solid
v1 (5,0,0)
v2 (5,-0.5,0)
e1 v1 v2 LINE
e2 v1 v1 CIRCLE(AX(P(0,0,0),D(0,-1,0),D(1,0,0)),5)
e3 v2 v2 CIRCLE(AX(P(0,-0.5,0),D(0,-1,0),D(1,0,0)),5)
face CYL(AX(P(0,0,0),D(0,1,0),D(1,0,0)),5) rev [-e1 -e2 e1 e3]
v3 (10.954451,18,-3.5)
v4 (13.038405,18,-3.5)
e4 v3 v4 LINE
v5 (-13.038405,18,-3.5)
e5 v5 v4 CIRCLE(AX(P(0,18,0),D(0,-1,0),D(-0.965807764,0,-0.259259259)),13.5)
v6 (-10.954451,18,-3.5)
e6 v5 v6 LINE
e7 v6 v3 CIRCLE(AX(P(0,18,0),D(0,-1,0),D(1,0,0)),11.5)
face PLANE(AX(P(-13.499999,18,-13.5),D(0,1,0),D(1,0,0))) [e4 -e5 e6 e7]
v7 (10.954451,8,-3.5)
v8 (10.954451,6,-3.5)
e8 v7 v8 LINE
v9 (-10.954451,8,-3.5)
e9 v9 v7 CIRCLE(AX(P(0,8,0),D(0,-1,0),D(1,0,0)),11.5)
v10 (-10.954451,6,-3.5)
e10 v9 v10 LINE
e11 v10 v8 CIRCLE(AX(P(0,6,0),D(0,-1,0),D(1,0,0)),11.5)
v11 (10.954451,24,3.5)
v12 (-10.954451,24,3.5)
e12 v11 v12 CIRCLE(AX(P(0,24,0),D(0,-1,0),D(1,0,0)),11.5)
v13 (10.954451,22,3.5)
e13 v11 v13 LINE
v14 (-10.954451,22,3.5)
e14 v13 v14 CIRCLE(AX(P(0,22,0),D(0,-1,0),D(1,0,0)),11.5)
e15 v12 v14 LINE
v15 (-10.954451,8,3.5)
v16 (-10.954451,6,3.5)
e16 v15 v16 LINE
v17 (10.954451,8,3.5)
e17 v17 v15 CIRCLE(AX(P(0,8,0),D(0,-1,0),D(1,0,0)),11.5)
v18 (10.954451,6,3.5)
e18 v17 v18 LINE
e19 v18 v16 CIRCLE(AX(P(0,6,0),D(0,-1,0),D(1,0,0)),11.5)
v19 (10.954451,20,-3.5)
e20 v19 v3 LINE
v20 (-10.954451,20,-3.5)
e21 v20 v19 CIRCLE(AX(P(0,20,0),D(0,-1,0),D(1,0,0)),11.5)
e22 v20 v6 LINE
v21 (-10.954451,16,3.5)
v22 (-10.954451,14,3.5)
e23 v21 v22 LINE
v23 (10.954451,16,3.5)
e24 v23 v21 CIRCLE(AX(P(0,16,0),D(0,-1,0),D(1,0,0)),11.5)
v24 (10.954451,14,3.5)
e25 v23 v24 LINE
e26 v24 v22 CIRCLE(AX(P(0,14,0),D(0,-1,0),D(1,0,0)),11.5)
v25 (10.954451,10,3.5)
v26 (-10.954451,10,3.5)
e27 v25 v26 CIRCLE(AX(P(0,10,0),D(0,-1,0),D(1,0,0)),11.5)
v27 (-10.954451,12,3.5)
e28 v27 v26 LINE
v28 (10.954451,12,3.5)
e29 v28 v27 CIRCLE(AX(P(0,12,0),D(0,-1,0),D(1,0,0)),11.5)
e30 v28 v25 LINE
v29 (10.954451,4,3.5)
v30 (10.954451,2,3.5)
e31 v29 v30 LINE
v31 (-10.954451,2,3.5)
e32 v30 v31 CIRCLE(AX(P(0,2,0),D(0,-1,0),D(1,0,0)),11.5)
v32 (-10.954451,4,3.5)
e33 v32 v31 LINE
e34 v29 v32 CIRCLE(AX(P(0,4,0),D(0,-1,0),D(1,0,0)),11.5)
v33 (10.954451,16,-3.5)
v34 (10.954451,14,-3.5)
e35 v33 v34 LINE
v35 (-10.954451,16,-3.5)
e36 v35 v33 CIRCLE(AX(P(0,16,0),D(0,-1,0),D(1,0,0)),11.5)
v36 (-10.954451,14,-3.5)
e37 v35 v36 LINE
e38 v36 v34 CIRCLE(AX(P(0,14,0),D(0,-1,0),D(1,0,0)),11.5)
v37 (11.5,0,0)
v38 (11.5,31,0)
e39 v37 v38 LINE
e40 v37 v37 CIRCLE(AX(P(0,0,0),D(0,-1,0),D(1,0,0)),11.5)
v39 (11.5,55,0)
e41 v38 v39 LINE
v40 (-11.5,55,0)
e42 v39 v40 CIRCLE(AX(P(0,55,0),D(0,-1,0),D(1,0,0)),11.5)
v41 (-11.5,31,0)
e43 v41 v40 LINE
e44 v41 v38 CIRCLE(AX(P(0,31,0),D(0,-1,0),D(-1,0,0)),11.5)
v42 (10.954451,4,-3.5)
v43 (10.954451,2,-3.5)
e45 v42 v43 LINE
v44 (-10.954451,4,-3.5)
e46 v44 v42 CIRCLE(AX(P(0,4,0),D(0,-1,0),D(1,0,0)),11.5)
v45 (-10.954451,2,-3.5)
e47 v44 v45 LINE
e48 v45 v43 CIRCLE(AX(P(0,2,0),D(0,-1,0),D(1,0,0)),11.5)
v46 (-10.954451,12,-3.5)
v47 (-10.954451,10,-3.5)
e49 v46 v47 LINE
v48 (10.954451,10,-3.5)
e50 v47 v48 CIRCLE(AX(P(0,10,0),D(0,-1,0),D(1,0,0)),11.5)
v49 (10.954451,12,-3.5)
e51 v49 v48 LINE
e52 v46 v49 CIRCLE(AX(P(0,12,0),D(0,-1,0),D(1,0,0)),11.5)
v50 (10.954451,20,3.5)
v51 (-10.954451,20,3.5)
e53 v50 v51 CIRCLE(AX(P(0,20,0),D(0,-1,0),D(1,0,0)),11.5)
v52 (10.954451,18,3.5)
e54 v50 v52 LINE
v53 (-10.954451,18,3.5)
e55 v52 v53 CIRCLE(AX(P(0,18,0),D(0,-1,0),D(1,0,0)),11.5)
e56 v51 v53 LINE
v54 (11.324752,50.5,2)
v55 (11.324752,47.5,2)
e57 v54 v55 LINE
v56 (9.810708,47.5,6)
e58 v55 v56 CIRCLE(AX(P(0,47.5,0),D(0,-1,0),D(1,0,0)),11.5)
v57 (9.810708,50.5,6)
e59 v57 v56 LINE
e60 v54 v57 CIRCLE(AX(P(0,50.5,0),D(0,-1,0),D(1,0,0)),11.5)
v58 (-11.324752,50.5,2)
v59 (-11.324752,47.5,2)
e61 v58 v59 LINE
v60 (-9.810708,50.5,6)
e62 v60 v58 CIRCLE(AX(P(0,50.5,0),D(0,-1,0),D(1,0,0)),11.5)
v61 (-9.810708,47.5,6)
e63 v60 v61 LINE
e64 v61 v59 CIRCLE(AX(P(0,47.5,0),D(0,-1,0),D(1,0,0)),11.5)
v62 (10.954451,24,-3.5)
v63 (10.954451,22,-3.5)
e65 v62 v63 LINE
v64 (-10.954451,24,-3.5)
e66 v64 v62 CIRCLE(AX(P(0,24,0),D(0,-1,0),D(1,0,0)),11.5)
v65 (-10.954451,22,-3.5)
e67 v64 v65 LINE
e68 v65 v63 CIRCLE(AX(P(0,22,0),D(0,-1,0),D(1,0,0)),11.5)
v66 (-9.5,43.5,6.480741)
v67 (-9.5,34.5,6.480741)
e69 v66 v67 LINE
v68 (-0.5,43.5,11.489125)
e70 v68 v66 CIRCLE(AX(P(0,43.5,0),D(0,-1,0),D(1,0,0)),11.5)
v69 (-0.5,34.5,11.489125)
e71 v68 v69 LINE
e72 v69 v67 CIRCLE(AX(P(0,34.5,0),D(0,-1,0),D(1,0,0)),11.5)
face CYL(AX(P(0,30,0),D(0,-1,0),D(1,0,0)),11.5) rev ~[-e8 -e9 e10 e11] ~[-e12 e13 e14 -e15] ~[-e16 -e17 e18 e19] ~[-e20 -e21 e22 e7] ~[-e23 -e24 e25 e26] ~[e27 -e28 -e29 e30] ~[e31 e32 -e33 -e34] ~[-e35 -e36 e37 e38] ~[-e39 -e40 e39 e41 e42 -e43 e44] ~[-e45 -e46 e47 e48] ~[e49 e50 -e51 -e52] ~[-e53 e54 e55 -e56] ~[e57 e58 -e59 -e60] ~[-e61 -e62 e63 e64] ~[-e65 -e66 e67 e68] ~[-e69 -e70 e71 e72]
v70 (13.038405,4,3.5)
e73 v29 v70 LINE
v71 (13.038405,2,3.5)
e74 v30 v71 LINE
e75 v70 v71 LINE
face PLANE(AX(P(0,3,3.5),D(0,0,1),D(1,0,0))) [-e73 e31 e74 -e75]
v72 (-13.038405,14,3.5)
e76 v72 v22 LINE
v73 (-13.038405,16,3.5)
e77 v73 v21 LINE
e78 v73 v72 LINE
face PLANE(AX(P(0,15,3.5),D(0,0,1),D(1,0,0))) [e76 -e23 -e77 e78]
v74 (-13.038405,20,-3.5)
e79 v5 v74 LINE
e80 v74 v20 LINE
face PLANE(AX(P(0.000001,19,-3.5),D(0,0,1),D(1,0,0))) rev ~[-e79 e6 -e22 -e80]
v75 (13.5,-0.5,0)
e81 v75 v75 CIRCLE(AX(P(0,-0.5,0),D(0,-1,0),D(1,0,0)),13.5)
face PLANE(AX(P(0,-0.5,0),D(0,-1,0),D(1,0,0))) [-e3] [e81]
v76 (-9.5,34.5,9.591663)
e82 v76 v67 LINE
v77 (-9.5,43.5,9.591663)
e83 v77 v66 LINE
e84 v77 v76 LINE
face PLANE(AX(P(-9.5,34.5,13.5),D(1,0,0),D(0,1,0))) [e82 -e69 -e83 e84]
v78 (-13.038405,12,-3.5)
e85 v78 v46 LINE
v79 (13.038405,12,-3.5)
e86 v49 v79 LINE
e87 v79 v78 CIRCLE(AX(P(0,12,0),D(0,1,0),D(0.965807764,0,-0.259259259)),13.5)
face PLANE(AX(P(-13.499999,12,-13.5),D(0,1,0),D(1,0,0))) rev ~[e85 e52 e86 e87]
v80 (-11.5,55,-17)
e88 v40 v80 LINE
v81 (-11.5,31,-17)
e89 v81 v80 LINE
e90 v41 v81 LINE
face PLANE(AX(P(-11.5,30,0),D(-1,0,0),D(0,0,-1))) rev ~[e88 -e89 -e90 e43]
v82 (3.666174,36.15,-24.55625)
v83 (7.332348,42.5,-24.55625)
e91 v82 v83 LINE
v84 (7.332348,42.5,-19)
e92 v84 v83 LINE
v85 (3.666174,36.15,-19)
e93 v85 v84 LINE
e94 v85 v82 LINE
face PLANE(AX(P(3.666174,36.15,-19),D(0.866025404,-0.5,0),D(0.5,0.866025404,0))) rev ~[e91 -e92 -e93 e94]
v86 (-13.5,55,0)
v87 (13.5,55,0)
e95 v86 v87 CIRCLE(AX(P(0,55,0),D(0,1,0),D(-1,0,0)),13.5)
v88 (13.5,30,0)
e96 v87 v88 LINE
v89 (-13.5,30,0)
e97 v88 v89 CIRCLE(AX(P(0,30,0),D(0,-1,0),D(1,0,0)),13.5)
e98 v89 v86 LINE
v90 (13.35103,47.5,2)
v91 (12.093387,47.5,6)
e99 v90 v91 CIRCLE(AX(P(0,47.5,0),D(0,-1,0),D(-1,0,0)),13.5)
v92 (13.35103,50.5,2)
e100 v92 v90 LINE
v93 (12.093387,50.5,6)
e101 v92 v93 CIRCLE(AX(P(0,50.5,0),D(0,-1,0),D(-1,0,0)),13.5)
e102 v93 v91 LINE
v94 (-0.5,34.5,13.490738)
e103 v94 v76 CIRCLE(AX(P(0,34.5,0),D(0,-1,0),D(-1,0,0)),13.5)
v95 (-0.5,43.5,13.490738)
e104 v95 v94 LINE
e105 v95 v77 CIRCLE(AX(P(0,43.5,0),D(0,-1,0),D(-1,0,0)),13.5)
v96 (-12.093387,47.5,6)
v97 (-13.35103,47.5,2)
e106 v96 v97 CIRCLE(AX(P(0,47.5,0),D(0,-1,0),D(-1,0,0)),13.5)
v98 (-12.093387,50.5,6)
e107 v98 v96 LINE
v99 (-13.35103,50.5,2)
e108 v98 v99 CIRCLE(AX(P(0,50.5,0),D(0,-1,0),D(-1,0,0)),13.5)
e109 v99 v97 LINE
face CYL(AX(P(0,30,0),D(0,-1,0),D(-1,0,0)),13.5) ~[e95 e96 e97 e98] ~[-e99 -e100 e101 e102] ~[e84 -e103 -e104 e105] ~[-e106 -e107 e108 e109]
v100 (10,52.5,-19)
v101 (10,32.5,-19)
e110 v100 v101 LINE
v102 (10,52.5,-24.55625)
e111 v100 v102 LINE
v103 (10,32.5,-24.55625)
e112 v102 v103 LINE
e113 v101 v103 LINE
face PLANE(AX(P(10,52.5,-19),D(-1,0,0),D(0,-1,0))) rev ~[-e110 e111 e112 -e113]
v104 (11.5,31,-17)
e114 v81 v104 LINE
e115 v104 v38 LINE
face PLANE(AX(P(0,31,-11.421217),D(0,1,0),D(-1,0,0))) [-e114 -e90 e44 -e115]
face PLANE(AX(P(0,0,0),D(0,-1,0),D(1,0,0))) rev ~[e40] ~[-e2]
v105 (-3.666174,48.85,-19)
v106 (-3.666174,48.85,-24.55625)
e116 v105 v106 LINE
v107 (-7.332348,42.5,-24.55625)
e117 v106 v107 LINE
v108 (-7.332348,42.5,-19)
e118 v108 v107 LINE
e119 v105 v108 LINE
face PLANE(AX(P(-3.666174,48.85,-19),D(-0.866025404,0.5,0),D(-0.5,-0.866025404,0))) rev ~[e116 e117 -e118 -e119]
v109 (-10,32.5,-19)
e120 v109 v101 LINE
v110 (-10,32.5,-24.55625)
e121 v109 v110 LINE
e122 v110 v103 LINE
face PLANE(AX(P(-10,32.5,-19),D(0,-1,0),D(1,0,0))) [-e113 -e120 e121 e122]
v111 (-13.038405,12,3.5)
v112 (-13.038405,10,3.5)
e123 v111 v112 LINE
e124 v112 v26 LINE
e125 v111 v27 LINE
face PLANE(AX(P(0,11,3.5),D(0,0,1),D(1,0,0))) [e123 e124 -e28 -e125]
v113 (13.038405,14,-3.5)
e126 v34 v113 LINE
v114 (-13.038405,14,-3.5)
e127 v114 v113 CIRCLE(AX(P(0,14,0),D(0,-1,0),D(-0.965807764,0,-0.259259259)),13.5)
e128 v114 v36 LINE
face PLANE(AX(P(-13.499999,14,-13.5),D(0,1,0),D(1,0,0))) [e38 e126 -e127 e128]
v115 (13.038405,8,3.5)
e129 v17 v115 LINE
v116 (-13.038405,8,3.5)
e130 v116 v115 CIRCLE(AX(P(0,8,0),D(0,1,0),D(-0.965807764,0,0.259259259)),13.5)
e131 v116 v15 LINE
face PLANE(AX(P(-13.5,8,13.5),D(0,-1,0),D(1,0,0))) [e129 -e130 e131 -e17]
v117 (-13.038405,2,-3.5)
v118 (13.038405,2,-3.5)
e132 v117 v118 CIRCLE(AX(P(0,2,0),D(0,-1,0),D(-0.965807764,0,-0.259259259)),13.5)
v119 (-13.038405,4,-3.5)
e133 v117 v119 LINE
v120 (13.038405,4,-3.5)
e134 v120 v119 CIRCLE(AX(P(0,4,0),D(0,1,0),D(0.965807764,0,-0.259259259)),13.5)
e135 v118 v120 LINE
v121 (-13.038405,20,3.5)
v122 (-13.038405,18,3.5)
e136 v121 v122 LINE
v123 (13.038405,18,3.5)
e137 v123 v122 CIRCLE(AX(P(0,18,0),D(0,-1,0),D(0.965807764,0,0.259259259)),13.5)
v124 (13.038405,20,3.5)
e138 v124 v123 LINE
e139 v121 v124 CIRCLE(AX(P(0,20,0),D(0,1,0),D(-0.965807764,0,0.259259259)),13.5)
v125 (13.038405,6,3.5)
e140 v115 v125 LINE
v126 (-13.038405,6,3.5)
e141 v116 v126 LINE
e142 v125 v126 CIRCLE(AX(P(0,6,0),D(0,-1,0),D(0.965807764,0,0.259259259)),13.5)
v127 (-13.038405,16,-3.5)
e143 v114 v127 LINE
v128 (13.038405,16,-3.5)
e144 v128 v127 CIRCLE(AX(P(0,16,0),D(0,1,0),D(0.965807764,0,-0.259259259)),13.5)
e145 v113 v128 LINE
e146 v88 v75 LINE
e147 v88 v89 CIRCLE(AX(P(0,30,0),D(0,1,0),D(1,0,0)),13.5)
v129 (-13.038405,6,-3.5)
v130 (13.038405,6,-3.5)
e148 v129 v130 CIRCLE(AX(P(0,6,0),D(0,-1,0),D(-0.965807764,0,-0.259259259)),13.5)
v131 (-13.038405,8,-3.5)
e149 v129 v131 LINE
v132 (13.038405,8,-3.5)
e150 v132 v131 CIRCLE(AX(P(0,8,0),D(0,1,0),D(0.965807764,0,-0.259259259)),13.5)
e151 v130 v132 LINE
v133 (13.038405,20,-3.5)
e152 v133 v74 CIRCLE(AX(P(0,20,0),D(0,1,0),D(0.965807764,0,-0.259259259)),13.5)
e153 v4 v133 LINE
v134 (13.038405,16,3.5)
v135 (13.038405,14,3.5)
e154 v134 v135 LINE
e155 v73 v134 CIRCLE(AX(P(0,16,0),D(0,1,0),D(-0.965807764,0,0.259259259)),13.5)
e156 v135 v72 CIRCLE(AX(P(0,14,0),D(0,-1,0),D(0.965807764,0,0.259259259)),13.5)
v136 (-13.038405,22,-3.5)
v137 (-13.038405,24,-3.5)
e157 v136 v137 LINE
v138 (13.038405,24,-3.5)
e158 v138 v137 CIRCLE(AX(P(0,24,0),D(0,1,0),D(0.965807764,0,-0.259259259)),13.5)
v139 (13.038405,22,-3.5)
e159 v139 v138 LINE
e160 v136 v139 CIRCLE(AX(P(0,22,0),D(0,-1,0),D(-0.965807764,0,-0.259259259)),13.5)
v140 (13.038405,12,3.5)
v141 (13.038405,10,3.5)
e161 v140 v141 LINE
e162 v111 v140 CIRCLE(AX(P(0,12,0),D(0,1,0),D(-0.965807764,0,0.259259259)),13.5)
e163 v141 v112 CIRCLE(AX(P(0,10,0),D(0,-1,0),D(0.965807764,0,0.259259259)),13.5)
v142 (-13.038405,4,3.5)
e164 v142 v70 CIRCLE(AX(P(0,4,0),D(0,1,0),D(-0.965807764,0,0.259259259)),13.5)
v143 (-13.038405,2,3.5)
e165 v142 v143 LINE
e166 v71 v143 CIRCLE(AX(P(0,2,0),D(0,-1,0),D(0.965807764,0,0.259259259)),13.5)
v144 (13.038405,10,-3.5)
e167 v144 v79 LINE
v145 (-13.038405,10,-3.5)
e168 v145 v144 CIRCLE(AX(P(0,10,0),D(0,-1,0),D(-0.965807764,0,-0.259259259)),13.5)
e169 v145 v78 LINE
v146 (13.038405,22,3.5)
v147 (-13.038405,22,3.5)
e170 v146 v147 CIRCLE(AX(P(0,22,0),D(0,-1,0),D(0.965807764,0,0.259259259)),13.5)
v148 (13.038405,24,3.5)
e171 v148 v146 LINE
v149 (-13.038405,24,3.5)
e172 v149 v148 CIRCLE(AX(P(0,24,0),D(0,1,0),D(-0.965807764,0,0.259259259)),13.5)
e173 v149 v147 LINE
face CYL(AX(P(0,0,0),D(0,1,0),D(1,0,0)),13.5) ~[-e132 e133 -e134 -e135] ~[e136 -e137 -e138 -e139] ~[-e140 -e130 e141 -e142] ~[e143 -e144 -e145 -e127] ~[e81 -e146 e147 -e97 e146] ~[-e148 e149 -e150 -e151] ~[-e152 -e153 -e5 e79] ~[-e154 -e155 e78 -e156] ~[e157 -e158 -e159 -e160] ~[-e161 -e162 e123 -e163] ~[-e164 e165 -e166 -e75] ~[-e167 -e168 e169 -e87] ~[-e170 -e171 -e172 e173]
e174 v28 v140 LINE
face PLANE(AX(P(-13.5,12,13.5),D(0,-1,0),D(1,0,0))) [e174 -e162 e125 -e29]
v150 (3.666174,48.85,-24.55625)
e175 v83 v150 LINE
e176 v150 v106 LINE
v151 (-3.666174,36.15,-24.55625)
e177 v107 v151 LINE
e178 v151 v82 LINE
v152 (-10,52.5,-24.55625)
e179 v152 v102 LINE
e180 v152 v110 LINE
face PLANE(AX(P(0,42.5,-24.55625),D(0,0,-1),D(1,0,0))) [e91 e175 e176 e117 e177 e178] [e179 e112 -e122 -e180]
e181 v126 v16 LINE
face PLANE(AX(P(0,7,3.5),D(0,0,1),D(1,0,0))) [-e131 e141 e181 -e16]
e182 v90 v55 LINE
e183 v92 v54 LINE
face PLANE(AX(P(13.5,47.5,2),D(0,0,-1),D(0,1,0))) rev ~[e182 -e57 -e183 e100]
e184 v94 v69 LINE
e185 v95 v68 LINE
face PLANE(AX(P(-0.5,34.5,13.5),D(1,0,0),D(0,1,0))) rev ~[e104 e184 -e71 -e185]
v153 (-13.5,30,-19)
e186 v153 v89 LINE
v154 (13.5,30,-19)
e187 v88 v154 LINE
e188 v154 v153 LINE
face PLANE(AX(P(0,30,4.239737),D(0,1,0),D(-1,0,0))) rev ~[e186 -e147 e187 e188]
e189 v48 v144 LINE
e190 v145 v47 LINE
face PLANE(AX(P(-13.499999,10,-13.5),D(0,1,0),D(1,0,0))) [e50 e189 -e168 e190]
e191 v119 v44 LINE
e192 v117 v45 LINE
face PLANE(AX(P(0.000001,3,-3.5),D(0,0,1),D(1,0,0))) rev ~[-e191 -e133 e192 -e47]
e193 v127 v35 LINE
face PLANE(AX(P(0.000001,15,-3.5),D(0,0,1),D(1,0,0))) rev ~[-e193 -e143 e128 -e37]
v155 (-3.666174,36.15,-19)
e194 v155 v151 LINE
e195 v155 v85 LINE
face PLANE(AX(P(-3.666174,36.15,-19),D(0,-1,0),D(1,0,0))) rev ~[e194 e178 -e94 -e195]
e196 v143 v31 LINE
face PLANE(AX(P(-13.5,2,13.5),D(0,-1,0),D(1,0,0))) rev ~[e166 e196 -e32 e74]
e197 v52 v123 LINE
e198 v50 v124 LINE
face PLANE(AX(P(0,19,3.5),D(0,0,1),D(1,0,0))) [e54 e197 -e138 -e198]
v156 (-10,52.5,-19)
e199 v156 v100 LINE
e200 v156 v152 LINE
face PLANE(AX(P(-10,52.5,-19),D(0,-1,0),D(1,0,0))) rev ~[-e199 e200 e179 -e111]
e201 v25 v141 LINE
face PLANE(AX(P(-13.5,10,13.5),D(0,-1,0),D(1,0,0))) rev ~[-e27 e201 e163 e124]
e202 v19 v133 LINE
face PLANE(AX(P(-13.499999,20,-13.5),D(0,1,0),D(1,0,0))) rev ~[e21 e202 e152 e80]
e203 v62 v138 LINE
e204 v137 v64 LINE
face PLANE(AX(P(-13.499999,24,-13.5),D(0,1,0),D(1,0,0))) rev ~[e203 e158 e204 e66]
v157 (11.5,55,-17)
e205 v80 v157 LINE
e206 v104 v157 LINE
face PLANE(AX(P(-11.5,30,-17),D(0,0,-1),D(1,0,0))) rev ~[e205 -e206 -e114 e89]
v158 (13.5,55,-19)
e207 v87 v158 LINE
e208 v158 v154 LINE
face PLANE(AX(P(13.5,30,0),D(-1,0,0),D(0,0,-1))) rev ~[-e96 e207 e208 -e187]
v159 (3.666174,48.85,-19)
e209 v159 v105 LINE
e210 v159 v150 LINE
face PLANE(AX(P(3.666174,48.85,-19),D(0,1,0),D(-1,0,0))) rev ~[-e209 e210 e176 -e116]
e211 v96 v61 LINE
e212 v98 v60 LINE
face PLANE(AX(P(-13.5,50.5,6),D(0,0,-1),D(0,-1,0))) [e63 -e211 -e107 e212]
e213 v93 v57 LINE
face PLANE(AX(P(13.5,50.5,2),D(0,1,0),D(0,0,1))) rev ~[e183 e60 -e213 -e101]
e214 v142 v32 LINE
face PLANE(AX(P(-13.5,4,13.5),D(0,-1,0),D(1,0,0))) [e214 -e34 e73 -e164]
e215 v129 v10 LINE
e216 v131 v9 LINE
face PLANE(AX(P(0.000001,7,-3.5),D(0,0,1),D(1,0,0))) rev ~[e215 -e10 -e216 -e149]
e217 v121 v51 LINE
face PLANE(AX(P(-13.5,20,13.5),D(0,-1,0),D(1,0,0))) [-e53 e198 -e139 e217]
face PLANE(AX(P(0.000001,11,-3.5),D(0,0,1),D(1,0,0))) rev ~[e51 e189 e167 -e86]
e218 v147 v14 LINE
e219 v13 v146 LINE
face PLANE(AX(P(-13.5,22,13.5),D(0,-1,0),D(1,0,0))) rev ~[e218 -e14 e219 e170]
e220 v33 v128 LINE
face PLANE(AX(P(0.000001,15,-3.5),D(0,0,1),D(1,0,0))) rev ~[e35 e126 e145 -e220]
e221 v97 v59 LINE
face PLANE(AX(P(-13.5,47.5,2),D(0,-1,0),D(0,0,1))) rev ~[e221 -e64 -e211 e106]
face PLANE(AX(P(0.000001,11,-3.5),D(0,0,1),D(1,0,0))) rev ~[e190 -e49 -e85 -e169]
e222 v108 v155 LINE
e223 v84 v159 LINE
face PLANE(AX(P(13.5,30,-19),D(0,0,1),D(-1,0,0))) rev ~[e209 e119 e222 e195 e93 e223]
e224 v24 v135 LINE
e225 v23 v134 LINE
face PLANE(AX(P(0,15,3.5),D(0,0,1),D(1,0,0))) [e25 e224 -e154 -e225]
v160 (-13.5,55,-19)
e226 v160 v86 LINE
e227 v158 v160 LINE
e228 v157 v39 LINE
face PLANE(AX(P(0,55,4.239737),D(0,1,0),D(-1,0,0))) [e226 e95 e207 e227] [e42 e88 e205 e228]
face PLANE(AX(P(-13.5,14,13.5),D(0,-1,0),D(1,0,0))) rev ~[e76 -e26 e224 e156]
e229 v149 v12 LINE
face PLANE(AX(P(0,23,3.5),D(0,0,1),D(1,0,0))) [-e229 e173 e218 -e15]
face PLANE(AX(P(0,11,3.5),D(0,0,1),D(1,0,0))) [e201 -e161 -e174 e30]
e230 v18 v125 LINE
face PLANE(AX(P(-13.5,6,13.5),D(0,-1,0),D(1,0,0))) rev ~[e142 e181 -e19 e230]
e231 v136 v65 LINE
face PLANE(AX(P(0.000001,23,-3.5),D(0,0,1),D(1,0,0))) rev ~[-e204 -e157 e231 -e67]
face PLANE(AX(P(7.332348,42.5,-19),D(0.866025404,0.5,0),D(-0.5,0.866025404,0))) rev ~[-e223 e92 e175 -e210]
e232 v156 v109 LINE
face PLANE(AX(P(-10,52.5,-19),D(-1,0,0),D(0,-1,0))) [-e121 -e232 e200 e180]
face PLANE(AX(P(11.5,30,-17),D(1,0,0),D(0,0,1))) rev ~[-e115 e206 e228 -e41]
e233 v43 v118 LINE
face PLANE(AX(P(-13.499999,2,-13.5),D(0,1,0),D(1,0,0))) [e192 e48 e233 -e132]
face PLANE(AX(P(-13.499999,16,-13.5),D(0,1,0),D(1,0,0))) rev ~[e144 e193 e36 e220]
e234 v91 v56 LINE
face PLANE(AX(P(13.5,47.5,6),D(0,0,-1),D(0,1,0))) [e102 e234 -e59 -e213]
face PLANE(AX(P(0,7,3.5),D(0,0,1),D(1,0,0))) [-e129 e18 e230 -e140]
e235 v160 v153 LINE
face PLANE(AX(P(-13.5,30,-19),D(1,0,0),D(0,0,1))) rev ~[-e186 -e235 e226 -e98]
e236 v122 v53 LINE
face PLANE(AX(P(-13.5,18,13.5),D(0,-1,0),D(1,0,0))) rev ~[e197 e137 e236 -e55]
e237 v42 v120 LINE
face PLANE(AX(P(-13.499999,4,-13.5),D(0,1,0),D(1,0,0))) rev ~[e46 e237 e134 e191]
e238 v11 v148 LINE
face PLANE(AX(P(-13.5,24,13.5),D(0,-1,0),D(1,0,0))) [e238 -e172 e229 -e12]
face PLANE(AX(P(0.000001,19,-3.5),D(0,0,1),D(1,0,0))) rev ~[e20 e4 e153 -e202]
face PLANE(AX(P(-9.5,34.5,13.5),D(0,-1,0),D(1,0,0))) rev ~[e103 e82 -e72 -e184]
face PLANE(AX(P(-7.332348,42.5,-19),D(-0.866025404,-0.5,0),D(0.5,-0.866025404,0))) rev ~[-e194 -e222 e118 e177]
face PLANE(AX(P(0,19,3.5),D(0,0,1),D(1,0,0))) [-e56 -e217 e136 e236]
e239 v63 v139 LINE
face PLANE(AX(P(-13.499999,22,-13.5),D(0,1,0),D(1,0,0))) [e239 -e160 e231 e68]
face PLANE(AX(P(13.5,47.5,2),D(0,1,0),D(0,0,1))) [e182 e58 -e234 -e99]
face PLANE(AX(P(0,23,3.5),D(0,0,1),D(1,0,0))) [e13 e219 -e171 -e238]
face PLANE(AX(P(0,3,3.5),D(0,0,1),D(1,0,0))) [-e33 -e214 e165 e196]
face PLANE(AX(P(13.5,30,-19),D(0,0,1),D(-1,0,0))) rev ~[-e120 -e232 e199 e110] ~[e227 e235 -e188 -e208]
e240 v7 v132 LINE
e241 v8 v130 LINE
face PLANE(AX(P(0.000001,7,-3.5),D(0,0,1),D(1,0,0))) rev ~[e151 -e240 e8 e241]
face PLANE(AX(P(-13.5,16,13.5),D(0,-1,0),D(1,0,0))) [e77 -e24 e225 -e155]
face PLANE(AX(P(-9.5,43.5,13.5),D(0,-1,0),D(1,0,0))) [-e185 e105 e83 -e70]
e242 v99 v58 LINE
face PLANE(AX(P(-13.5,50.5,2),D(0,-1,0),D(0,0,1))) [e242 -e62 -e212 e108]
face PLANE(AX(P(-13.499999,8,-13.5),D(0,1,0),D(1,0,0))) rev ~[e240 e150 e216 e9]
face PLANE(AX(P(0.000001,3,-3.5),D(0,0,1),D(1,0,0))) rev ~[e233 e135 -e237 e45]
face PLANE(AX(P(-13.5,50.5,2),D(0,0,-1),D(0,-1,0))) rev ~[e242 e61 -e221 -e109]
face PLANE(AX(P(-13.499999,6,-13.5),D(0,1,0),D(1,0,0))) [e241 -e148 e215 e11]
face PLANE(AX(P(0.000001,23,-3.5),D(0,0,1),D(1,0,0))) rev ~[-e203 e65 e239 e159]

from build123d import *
from build123d import SkipClean  # not in build123d's __all__

# Parameters (mm, degrees)
F0_R      = 13.5
F0_R_2    = 11.5
F1_DEPTH  = 30
F2_R      = 13.5
F2_R_2    = 5
F3_DEPTH  = 0.5
F5_W      = 27
F5_H      = 2
F6_DEPTH  = 10
F8_W      = 27
F8_H      = 2
F9_DEPTH  = 10
F11_DEPTH = 25
F13_DEPTH = 1
F14_W     = 20
F14_H     = 20
F15_DEPTH = 5.55625
F16_W     = 3
F16_H     = 4
F17_DEPTH = 4
F18_W     = 3
F18_H     = 4
F19_DEPTH = 4
F20_W     = 9
F20_H     = 9
F21_DEPTH = 8


# Not quite as in the source:
# - after a boolean that leaves OpenCascade's solid faulty, fix() repairs it
# - a length typed as a fraction of an inch, garbled in the dataset ("3 / 203.2 mm" for 3/8 in), is restored


with BuildPart() as f1:
    # F0 (on Front) → F1 (new body)
    with BuildSketch(Plane.XZ):
        Circle(F0_R)
        Circle(F0_R_2, mode=Mode.SUBTRACT)
    extrude(amount=-F1_DEPTH)

    # F2 (on Front) → F3 (join)
    with BuildSketch(Plane.XZ):
        Circle(F2_R)
        Circle(F2_R_2, mode=Mode.SUBTRACT)
    extrude(amount=F3_DEPTH)

    # F5 (on offset) → F6 (cut)
    with BuildSketch(Plane.XY.offset(13.5)):
        with Locations((0, 2.9999998671)):
            Rectangle(F5_W, F5_H)
        with Locations((0, 22.9999998671)):
            Rectangle(F5_W, F5_H)
        with Locations((0, 6.9999998671)):
            Rectangle(F5_W, F5_H)
        with Locations((0, 10.9999998671)):
            Rectangle(F5_W, F5_H)
        with Locations((0, 14.9999998671)):
            Rectangle(F5_W, F5_H)
        with Locations((0, 18.9999998671)):
            Rectangle(F5_W, F5_H)
    extrude(amount=-F6_DEPTH, mode=Mode.SUBTRACT)

    # F8 (on offset) → F9 (cut)
    with BuildSketch(Plane.XY.offset(-13.5)):
        with Locations((5.811e-07, 3.000000095)):
            Rectangle(F8_W, F8_H)
        with Locations((5.811e-07, 7.000000095)):
            Rectangle(F8_W, F8_H)
        with Locations((5.811e-07, 11.000000095)):
            Rectangle(F8_W, F8_H)
        with Locations((5.811e-07, 15.000000095)):
            Rectangle(F8_W, F8_H)
        with Locations((5.811e-07, 19.000000095)):
            Rectangle(F8_W, F8_H)
        with Locations((5.811e-07, 23.000000095)):
            Rectangle(F8_W, F8_H)
    extrude(amount=F9_DEPTH, mode=Mode.SUBTRACT)

    # F10 (on face) → F11 (join)
    with BuildSketch(Plane(origin=(0, 30, 0), x_dir=(-1, 0, 0), z_dir=(0, 1, 0))):
        with BuildLine():
            Line((11.5, 0), (11.5, -7.0710678119))
            ThreePointArc((11.5, -7.0710678119), (12.9903810568, -3.6742346142), (13.5, 0))
            ThreePointArc((13.5, 0), (0, 13.5), (-13.5, 0))
            ThreePointArc((-13.5, 0), (-12.9903810568, -3.6742346142), (-11.5, -7.0710678119))
            Line((-11.5, -7.0710678119), (-11.5, 0))
            ThreePointArc((-11.5, 0), (0, 11.5), (11.5, 0))
        make_face()
        with BuildLine():
            ThreePointArc((13.5, 0), (12.9903810568, -3.6742346142), (11.5, -7.0710678119))
            Line((11.5, -7.0710678119), (11.5, -17))
            Line((11.5, -17), (-11.5, -17))
            Line((-11.5, -17), (-11.5, -7.0710678119))
            ThreePointArc((-11.5, -7.0710678119), (-12.9903810568, -3.6742346142), (-13.5, 0))
            Line((-13.5, 0), (-13.5, -19))
            Line((-13.5, -19), (13.5, -19))
            Line((13.5, -19), (13.5, 0))
        make_face()
    with SkipClean():  # cleaning this boolean's faces spoils the solid; the shape is the same uncleaned
        extrude(amount=F11_DEPTH)

    # F12 (on face) → F13 (join)
    with BuildSketch(Plane(origin=(0, 30, 0), x_dir=(-1, 0, 0), z_dir=(0, 1, 0))):
        with BuildLine():
            Line((13.5, -19), (13.5, 0))
            ThreePointArc((13.5, 0), (12.9903810568, -3.6742346142), (11.5, -7.0710678119))
            ThreePointArc((11.5, -7.0710678119), (0, -13.5), (-11.5, -7.0710678119))
            ThreePointArc((-11.5, -7.0710678119), (-12.9903810568, -3.6742346142), (-13.5, 0))
            Line((-13.5, 0), (-13.5, -19))
            Line((-13.5, -19), (13.5, -19))
        make_face()
        with BuildLine():
            ThreePointArc((-11.5, -7.0710678119), (0, -13.5), (11.5, -7.0710678119))
            Line((11.5, -7.0710678119), (11.5, 0))
            ThreePointArc((11.5, 0), (0, -11.5), (-11.5, 0))
            Line((-11.5, 0), (-11.5, -7.0710678119))
        make_face()
    with SkipClean():  # cleaning this boolean's faces spoils the solid; the shape is the same uncleaned
        extrude(amount=F13_DEPTH)

    # F14 (on face) → F15 (join)
    with BuildSketch(Plane(origin=(0, 0, -19), x_dir=(1, 0, 0), z_dir=(0, 0, -1))):
        with Locations((0, -42.5)):
            Rectangle(F14_W, F14_H)
        Polygon((-3.6661742094, -36.15), (3.6661742094, -36.15), (7.3323484187, -42.5), (3.6661742094, -48.85), (-3.6661742094, -48.85), (-7.3323484187, -42.5), align=None, mode=Mode.SUBTRACT)
    extrude(amount=F15_DEPTH)

    add(f1.part.fix(), mode=Mode.REPLACE)

    # F16 (on face) → F17 (cut)
    with BuildSketch(Plane.YZ.offset(13.5)):
        with Locations((49, 4)):
            Rectangle(F16_W, F16_H)
    extrude(amount=-F17_DEPTH, mode=Mode.SUBTRACT)

    # F18 (on face) → F19 (cut)
    with BuildSketch(Plane(origin=(-13.5, 0, 0), x_dir=(0, -1, 0), z_dir=(-1, 0, 0))):
        with Locations((-49, 4)):
            Rectangle(F18_W, F18_H)
    extrude(amount=-F19_DEPTH, mode=Mode.SUBTRACT)

    # F20 (on offset) → F21 (cut)
    with BuildSketch(Plane.XY.offset(13.5)):
        with Locations((-5, 39)):
            Rectangle(F20_W, F20_H)
    extrude(amount=-F21_DEPTH, mode=Mode.SUBTRACT)


solid = f1.part
